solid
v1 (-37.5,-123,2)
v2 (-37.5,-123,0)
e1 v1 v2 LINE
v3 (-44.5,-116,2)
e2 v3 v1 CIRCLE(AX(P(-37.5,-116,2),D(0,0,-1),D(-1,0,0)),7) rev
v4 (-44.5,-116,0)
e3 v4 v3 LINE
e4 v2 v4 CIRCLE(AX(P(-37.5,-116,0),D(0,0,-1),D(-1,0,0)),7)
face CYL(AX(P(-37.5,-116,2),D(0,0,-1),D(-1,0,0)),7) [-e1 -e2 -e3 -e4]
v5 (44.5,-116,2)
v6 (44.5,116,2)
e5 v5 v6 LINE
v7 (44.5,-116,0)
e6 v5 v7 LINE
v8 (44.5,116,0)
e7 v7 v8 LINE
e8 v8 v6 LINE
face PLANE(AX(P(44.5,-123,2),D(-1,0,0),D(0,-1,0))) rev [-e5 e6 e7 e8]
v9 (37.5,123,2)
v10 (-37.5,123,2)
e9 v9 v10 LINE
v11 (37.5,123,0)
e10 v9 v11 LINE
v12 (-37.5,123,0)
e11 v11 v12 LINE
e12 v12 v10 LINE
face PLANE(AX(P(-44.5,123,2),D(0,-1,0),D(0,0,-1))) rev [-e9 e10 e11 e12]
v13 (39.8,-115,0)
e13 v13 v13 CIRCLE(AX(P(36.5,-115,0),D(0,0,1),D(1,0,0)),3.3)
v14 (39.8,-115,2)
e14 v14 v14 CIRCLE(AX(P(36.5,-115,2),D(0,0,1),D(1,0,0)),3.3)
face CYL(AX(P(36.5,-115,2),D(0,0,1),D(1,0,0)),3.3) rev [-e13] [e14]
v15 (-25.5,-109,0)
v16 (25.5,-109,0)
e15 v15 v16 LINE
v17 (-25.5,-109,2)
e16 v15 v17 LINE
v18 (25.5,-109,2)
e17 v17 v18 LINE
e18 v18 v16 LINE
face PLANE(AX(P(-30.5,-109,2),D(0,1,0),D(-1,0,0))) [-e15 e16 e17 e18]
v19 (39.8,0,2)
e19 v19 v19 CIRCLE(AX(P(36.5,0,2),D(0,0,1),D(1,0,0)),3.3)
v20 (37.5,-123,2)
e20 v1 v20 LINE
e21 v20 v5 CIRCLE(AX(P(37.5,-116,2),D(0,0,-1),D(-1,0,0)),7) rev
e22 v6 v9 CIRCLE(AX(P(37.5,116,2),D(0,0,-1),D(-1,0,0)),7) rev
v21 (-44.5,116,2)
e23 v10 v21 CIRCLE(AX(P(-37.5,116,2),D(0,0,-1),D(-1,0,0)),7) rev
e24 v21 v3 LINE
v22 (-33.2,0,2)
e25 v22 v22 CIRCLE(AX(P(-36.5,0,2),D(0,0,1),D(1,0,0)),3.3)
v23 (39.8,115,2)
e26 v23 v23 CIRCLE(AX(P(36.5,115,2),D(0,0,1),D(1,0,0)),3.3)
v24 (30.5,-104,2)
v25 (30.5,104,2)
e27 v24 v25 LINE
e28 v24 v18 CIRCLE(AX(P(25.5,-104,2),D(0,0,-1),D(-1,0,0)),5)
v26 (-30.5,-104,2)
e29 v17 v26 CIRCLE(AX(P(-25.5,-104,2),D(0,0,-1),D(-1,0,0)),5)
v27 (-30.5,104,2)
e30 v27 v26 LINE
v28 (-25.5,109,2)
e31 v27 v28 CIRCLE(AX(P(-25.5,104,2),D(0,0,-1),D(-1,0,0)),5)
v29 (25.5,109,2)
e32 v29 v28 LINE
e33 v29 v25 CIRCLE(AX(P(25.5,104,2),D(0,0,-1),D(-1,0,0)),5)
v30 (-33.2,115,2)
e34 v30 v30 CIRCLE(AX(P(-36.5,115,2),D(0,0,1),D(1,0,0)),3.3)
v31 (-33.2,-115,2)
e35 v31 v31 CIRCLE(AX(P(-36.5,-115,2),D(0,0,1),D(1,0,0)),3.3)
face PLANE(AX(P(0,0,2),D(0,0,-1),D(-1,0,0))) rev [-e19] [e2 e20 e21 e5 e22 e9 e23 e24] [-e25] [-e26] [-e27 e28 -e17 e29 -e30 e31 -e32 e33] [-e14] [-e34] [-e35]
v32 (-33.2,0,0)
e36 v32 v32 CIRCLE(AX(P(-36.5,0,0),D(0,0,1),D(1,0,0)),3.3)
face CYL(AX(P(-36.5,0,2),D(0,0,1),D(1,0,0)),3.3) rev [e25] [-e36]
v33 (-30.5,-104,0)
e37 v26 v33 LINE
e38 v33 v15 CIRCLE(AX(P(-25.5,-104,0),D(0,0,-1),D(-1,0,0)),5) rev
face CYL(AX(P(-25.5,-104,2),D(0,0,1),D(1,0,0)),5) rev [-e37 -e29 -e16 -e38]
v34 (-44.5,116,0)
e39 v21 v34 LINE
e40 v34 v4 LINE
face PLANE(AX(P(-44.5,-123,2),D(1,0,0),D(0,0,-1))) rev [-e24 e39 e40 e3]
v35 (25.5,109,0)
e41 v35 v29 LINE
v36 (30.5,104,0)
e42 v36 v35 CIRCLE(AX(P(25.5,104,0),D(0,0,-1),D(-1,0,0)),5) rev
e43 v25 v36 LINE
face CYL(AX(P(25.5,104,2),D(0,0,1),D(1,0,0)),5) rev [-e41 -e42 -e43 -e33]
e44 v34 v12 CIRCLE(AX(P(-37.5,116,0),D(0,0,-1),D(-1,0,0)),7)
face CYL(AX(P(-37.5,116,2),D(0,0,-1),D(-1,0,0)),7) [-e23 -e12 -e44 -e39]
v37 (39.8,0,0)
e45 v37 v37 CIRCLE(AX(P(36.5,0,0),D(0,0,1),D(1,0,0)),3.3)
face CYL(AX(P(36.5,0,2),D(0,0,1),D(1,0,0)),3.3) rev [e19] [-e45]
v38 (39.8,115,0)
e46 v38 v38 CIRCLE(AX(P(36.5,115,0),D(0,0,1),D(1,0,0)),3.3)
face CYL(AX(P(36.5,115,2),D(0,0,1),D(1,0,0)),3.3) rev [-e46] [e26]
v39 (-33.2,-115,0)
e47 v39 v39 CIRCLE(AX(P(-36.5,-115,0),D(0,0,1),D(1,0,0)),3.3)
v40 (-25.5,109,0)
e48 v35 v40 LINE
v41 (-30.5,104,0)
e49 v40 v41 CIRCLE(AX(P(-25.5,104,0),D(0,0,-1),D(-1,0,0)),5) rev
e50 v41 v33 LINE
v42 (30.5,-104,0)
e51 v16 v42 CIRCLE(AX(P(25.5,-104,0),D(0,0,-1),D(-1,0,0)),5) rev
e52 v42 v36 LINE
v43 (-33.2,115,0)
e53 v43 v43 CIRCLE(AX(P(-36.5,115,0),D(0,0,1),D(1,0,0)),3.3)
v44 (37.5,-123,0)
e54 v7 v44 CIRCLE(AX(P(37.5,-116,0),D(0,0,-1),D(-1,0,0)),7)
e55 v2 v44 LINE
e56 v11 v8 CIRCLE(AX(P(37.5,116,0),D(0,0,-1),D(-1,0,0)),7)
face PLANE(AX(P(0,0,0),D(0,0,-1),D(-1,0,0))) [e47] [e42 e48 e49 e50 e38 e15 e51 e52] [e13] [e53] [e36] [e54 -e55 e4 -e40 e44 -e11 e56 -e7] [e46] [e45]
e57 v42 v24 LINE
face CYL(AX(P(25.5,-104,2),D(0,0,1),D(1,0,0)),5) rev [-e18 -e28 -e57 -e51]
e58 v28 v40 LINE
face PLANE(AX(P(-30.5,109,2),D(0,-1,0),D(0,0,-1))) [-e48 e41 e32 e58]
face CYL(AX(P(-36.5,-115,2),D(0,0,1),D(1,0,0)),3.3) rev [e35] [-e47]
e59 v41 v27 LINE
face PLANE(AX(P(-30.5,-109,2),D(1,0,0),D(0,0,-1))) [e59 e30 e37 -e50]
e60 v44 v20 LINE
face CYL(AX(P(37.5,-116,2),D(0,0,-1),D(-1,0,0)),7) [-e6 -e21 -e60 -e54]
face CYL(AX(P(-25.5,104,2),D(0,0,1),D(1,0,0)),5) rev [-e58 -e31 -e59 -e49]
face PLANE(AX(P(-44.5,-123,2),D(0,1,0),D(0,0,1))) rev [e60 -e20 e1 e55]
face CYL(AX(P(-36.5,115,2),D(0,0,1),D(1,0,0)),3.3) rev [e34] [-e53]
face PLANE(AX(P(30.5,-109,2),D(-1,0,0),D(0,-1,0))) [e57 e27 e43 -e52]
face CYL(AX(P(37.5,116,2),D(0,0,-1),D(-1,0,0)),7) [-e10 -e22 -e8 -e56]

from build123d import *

# Parameters (mm, degrees)
SKETCH_1_W              = 89
SKETCH_1_H              = 246
SKETCH_1_W_2            = 61
SKETCH_1_H_2            = 218
EXTRUDE_1_DEPTH         = 2
FILLET_1_R              = 5
FILLET_2_R              = 7
HOLE_WIZARD_1_OUTLINE_R = 3.3
HOLE_WIZARD_1_DEPTH     = 2


# Read off the part's stored shape, not the designer's step: 孔1
with BuildPart() as part:
    # 草图1 → 凸台-拉伸1 (new body)
    with BuildSketch(Plane.XY):
        Rectangle(SKETCH_1_W, SKETCH_1_H)
        Rectangle(SKETCH_1_W_2, SKETCH_1_H_2, mode=Mode.SUBTRACT)
    extrude(amount=EXTRUDE_1_DEPTH)

    # 圆角1
    fillet_1_edges = [part.edges().sort_by_distance(p)[0] for p in [
        (30.5, -109, 1),
        (30.5, 109, 1),
        (-30.5, 109, 1),
        (-30.5, -109, 1),
    ]]
    fillet(fillet_1_edges, radius=FILLET_1_R)

    # 圆角2
    fillet_2_edges = [part.edges().sort_by_distance(p)[0] for p in [
        (44.5, -123, 1),
        (-44.5, -123, 1),
        (-44.5, 123, 1),
        (44.5, 123, 1),
    ]]
    fillet(fillet_2_edges, radius=FILLET_2_R)

    # 孔1 outline → 孔1 (cut)
    with BuildSketch(Plane.XY):
        with Locations((36.5, 0)):
            Circle(HOLE_WIZARD_1_OUTLINE_R)
        with Locations((-36.5, 0)):
            Circle(HOLE_WIZARD_1_OUTLINE_R)
        with Locations((36.5, -115)):
            Circle(HOLE_WIZARD_1_OUTLINE_R)
        with Locations((-36.5, 115)):
            Circle(HOLE_WIZARD_1_OUTLINE_R)
        with Locations((-36.5, -115)):
            Circle(HOLE_WIZARD_1_OUTLINE_R)
        with Locations((36.5, 115)):
            Circle(HOLE_WIZARD_1_OUTLINE_R)
    extrude(amount=HOLE_WIZARD_1_DEPTH, mode=Mode.SUBTRACT)


solid = part.part
